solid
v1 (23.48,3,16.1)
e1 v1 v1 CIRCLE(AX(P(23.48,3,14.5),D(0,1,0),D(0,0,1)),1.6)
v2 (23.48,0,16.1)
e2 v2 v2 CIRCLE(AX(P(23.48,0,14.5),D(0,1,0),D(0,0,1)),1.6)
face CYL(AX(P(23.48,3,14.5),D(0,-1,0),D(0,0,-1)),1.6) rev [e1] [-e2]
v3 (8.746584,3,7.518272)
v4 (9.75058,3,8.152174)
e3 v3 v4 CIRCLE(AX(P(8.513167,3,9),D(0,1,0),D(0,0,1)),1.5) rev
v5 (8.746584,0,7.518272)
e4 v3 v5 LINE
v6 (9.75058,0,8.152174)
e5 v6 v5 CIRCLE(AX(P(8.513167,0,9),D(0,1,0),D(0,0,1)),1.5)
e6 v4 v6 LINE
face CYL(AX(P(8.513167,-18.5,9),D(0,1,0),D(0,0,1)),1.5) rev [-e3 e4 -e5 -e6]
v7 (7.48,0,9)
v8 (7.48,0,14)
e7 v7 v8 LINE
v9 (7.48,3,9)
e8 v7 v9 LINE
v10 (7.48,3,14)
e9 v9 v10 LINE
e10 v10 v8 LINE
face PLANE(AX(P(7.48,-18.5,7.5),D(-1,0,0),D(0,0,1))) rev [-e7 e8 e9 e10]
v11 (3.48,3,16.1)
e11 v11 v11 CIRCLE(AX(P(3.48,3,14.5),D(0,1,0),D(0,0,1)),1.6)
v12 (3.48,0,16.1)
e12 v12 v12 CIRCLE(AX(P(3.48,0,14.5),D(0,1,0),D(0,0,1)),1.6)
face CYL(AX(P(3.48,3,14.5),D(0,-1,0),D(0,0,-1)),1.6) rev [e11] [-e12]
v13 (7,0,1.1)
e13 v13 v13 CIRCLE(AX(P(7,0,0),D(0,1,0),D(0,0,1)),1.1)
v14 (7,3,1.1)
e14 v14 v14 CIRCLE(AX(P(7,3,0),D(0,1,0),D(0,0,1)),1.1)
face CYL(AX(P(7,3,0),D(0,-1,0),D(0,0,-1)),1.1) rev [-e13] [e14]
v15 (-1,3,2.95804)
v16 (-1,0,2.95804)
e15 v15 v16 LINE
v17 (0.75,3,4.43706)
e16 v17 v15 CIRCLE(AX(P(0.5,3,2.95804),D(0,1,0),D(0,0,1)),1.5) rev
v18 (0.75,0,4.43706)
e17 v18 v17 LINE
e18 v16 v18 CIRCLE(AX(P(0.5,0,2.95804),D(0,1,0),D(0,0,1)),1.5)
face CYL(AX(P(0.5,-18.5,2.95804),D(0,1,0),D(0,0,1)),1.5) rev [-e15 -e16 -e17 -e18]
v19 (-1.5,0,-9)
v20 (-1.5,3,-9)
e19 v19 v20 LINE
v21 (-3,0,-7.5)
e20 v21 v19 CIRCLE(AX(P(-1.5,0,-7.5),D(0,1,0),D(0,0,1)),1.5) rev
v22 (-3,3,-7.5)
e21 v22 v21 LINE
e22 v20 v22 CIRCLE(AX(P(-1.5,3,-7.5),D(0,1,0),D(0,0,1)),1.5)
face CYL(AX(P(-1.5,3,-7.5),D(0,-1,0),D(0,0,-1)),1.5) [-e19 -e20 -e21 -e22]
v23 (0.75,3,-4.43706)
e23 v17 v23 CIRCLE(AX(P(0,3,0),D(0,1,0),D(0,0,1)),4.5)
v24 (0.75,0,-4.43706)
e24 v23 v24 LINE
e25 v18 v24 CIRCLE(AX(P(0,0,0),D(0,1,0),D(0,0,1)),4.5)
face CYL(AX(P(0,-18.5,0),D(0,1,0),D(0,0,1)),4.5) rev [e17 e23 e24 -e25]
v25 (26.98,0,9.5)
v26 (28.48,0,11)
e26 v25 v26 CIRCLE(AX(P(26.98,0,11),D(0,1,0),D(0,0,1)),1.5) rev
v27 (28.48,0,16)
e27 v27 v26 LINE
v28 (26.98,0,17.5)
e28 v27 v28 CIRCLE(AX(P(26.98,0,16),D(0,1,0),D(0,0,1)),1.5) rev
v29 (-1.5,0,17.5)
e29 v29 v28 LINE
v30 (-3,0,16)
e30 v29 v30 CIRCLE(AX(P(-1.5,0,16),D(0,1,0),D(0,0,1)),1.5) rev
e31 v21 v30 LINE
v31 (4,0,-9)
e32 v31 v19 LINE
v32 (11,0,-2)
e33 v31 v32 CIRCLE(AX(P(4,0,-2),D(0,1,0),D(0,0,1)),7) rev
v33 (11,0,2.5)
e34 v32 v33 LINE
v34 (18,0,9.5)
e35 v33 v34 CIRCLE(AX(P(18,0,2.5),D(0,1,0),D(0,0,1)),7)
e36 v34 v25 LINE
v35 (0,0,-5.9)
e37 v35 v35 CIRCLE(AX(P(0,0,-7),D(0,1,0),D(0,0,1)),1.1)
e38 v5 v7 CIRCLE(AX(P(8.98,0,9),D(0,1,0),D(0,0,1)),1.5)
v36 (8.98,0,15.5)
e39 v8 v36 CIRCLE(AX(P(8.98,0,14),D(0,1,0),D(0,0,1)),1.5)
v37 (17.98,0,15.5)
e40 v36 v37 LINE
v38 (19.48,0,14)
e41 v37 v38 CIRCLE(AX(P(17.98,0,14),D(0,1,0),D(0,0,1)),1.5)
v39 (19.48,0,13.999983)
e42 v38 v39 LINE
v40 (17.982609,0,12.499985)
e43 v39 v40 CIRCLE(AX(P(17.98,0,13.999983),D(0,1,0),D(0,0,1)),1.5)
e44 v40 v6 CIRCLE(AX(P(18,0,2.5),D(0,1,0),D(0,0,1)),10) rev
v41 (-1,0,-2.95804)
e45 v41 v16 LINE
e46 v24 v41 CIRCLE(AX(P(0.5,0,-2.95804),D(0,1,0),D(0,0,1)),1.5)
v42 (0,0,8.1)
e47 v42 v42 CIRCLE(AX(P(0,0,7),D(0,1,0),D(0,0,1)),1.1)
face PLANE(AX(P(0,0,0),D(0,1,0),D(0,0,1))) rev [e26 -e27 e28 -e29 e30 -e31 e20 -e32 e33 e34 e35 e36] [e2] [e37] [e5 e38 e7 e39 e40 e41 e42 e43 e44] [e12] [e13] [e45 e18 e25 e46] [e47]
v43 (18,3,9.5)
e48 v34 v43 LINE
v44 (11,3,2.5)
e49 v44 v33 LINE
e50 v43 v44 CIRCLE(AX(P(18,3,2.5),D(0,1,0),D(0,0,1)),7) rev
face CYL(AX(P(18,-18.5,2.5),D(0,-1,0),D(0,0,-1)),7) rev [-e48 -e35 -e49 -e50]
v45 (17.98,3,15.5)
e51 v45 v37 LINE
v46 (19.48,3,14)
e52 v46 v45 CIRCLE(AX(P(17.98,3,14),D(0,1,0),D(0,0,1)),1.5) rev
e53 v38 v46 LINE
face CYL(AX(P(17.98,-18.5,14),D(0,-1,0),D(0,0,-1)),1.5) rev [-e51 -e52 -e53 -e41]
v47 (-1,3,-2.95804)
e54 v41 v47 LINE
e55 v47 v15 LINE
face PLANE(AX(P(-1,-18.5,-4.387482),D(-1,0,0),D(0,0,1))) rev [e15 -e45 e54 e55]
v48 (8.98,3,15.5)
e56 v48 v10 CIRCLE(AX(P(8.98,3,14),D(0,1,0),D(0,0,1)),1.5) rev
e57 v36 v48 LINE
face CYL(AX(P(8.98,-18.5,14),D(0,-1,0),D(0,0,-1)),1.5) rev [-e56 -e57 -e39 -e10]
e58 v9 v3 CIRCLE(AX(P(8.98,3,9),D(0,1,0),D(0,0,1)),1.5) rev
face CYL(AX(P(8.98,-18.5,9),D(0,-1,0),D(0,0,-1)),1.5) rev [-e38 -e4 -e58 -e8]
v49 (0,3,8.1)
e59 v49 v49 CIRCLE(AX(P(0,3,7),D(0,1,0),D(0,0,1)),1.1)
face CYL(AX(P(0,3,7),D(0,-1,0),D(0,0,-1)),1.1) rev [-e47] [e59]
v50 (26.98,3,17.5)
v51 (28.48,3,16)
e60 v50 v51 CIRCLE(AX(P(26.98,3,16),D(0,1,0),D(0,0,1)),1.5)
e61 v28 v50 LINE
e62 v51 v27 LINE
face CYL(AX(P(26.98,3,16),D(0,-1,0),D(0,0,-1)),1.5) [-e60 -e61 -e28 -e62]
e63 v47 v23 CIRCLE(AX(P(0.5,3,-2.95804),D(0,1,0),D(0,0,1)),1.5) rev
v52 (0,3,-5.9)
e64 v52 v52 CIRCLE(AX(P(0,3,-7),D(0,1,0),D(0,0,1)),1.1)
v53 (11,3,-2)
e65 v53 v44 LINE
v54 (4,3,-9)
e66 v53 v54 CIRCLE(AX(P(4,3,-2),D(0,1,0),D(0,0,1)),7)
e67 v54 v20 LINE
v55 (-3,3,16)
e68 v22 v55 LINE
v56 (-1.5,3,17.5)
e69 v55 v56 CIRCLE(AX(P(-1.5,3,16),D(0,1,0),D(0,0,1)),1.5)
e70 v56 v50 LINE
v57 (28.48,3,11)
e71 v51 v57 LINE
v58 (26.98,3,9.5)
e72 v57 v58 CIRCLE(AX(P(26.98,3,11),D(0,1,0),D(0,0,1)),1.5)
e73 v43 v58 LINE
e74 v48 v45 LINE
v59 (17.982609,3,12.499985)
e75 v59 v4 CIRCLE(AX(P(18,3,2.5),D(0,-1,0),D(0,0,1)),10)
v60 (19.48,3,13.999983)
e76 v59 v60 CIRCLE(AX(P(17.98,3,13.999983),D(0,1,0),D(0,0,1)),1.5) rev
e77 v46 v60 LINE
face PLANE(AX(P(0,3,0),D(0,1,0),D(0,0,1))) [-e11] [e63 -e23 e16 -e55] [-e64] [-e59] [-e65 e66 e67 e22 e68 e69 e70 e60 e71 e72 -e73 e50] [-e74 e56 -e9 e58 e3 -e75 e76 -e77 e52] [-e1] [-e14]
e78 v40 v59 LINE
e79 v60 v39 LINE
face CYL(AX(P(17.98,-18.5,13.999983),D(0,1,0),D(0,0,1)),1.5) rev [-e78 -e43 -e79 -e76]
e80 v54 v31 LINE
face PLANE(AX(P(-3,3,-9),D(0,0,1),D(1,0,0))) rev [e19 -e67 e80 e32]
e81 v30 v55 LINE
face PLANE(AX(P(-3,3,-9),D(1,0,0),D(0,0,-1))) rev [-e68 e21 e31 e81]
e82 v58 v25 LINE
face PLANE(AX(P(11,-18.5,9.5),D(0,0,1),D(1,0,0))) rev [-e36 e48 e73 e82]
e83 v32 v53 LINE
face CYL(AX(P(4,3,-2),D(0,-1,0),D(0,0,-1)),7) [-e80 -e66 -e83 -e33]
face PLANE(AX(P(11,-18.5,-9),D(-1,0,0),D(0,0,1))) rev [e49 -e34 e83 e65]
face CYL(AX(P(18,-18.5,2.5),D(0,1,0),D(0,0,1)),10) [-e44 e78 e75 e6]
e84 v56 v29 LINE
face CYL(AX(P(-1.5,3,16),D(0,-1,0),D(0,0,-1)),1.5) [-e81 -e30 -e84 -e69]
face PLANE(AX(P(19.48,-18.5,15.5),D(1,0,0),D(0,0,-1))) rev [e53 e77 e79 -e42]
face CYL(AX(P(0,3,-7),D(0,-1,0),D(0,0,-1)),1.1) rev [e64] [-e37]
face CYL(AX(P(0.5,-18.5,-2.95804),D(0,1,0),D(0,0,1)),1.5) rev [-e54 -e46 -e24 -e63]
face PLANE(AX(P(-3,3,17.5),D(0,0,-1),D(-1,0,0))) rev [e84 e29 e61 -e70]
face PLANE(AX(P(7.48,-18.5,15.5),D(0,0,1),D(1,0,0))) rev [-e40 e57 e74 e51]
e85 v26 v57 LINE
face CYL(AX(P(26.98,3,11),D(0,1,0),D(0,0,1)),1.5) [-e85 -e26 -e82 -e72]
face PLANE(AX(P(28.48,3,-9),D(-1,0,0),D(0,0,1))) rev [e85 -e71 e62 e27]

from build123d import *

# Parameters (mm, degrees)
SKETCH_1_W          = 31.48
SKETCH_1_H          = 26.5
SKETCH_1_R          = 1.1
SKETCH_1_R_2        = 1.6
EXTRUDE_1_DEPTH     = 3
SKETCH_2_W          = 17.48
SKETCH_2_H          = 18.5
CUT_EXTRUDE_1_DEPTH = 21.5
FILLET_1_R          = 7
CUT_EXTRUDE_2_DEPTH = 21.5
FILLET_2_R          = 1.5


with BuildPart() as part:
    # 草图1 → 凸台-拉伸1 (new body)
    with BuildSketch(Plane(origin=(0, 0, 0), x_dir=(1, 0, 0), z_dir=(0, 1, 0))):
        with Locations((12.74, -4.25)):
            Rectangle(SKETCH_1_W, SKETCH_1_H)
        with Locations(Location((0, 7, 0), (0, 0, 270))):
            Circle(SKETCH_1_R, mode=Mode.SUBTRACT)
        with Locations(Location((7, 0, 0), (0, 0, 270))):
            Circle(SKETCH_1_R, mode=Mode.SUBTRACT)
        with Locations(Location((0, -7, 0), (0, 0, 270))):
            Circle(SKETCH_1_R, mode=Mode.SUBTRACT)
        with Locations(Location((3.48, -14.5, 0), (0, 0, 270))):
            Circle(SKETCH_1_R_2, mode=Mode.SUBTRACT)
        with Locations(Location((23.48, -14.5, 0), (0, 0, 270))):
            Circle(SKETCH_1_R_2, mode=Mode.SUBTRACT)
    extrude(amount=EXTRUDE_1_DEPTH)

    # 草图2 → 切除-拉伸1 (cut)
    with BuildSketch(Plane(origin=(0, 3, 0), x_dir=(1, 0, 0), z_dir=(0, 1, 0))):
        with Locations((19.74, -0.25)):
            Rectangle(SKETCH_2_W, SKETCH_2_H)
        with BuildLine():
            Line((-1, 4.387482194), (-1, -4.387482194))
            ThreePointArc((-1, -4.387482194), (4.5, 0), (-1, 4.387482194))
        make_face()
    extrude(amount=-CUT_EXTRUDE_1_DEPTH, mode=Mode.SUBTRACT)

    # 圆角1
    fillet_1_edges = [part.edges().sort_by_distance(p)[0] for p in [
        (11, 1.5, -9),
        (11, 1.5, 9.5),
    ]]
    fillet(fillet_1_edges, radius=FILLET_1_R)

    # 草图3 → 切除-拉伸2 (cut)
    with BuildSketch(Plane(origin=(0, 3, 0), x_dir=(1, 0, 0), z_dir=(0, 1, 0))):
        with BuildLine():
            Line((7.48, -7.5), (7.48, -15.5))
            Line((7.48, -15.5), (19.48, -15.5))
            Line((19.48, -15.5), (19.48, -12.389873609))
            ThreePointArc((19.48, -12.389873609), (13.656415306, -11.507400958), (9.339745962, -7.5))
            Line((9.339745962, -7.5), (7.48, -7.5))
        make_face()
    extrude(amount=-CUT_EXTRUDE_2_DEPTH, mode=Mode.SUBTRACT)

    # 圆角2
    # the kernel refuses this fillet: 1.5 mm, written as the material it adds along each edge
    with BuildSketch(Plane(origin=(-1, 3, -4.387482194), x_dir=(0, 0, 1), z_dir=(0, -1, 0))) as fillet_2_piece_1:
        with BuildLine():
            CenterArc((1.429442302, -1.5), FILLET_2_R, 90, 99.594068227)
            ThreePointArc((-0.049577644, -1.75), (-0.110713057, -0.872565759), (0, 0))
            Line((0, 0), (1.429442302, 0))
        make_face()
    extrude(amount=3)
    with BuildSketch(Plane(origin=(-1, 3, 4.387482194), x_dir=(0, 0, -1), z_dir=(0, -1, 0))) as fillet_2_piece_2:
        with BuildLine():
            CenterArc((1.429442302, 1.5), FILLET_2_R, 170.405931773, 99.594068227)
            ThreePointArc((-0.049577644, 1.75), (-0.110713057, 0.872565759), (0, 0))
            Line((0, 0), (1.429442302, 0))
        make_face()
    extrude(amount=3)
    with BuildSketch(Plane(origin=(19.48, 3, 12.389873609), x_dir=(-0.9973071885231932, 0, 0.07333738282733993), z_dir=(0, -1, 0))) as fillet_2_piece_3:
        with BuildLine():
            CenterArc((1.614041963, -1.495767206), FILLET_2_R, 94.30534313, 89.900355116)
            Line((0.11808118, -1.60577328), (0, 0))
            ThreePointArc((0, 0), (0.750717192, -0.02821863), (1.501434384, 0))
        make_face()
    extrude(amount=3)
    with BuildSketch(Plane(origin=(19.48, 3, 15.5), x_dir=(0, 0, -1), z_dir=(0, -1, 0)), Plane(origin=(7.48, 3, 7.5), x_dir=(0, 0, 1), z_dir=(0, -1, 0))) as fillet_2_piece_4:
        with BuildLine():
            CenterArc((FILLET_2_R, -FILLET_2_R), FILLET_2_R, 90, 90)
            Line((0, -FILLET_2_R), (0, 0))
            Line((0, 0), (FILLET_2_R, 0))
        make_face()
    extrude(amount=3)
    with BuildSketch(Plane(origin=(7.48, 3, 15.5), x_dir=(0, 0, -1), z_dir=(0, -1, 0))) as fillet_2_piece_5:
        with BuildLine():
            CenterArc((FILLET_2_R, FILLET_2_R), FILLET_2_R, 180, 90)
            Line((0, FILLET_2_R), (0, 0))
            Line((0, 0), (FILLET_2_R, 0))
        make_face()
    extrude(amount=3)
    with BuildSketch(Plane(origin=(9.339745962, 3, 7.5), x_dir=(-1, 0, 0), z_dir=(0, -1, 0))) as fillet_2_piece_6:
        with BuildLine():
            CenterArc((0.826578943, -1.5), FILLET_2_R, 90, 55.58261129)
            ThreePointArc((-0.410834055, -0.652173913), (-0.199131088, -0.330046756), (0, 0))
            Line((0, 0), (0.826578943, 0))
        make_face()
    extrude(amount=3)
    # the kernel refuses this fillet: 1.5 mm, written as the material it takes off along each edge
    with BuildSketch(Plane(origin=(28.48, 6.75, 9.5), x_dir=(-1, 0, 0), z_dir=(0, -1, 0)), Plane(origin=(-3, -3.75, 17.5), x_dir=(0, 0, -1), z_dir=(0, 1, 0)), Plane(origin=(-3, -3.75, -9), x_dir=(1, 0, 0), z_dir=(0, 1, 0))) as fillet_2_2_piece_1:
        with BuildLine():
            CenterArc((FILLET_2_R, -FILLET_2_R), FILLET_2_R, 90, 90)
            Line((0, -FILLET_2_R), (0, 0))
            Line((0, 0), (FILLET_2_R, 0))
        make_face()
    extrude(amount=10.5, mode=Mode.SUBTRACT)
    with BuildSketch(Plane(origin=(28.48, -3.75, 17.5), x_dir=(0, 0, -1), z_dir=(0, 1, 0))) as fillet_2_2_piece_2:
        with BuildLine():
            CenterArc((FILLET_2_R, FILLET_2_R), FILLET_2_R, 180, 90)
            Line((0, FILLET_2_R), (0, 0))
            Line((0, 0), (FILLET_2_R, 0))
        make_face()
    extrude(amount=10.5, mode=Mode.SUBTRACT)


solid = part.part
